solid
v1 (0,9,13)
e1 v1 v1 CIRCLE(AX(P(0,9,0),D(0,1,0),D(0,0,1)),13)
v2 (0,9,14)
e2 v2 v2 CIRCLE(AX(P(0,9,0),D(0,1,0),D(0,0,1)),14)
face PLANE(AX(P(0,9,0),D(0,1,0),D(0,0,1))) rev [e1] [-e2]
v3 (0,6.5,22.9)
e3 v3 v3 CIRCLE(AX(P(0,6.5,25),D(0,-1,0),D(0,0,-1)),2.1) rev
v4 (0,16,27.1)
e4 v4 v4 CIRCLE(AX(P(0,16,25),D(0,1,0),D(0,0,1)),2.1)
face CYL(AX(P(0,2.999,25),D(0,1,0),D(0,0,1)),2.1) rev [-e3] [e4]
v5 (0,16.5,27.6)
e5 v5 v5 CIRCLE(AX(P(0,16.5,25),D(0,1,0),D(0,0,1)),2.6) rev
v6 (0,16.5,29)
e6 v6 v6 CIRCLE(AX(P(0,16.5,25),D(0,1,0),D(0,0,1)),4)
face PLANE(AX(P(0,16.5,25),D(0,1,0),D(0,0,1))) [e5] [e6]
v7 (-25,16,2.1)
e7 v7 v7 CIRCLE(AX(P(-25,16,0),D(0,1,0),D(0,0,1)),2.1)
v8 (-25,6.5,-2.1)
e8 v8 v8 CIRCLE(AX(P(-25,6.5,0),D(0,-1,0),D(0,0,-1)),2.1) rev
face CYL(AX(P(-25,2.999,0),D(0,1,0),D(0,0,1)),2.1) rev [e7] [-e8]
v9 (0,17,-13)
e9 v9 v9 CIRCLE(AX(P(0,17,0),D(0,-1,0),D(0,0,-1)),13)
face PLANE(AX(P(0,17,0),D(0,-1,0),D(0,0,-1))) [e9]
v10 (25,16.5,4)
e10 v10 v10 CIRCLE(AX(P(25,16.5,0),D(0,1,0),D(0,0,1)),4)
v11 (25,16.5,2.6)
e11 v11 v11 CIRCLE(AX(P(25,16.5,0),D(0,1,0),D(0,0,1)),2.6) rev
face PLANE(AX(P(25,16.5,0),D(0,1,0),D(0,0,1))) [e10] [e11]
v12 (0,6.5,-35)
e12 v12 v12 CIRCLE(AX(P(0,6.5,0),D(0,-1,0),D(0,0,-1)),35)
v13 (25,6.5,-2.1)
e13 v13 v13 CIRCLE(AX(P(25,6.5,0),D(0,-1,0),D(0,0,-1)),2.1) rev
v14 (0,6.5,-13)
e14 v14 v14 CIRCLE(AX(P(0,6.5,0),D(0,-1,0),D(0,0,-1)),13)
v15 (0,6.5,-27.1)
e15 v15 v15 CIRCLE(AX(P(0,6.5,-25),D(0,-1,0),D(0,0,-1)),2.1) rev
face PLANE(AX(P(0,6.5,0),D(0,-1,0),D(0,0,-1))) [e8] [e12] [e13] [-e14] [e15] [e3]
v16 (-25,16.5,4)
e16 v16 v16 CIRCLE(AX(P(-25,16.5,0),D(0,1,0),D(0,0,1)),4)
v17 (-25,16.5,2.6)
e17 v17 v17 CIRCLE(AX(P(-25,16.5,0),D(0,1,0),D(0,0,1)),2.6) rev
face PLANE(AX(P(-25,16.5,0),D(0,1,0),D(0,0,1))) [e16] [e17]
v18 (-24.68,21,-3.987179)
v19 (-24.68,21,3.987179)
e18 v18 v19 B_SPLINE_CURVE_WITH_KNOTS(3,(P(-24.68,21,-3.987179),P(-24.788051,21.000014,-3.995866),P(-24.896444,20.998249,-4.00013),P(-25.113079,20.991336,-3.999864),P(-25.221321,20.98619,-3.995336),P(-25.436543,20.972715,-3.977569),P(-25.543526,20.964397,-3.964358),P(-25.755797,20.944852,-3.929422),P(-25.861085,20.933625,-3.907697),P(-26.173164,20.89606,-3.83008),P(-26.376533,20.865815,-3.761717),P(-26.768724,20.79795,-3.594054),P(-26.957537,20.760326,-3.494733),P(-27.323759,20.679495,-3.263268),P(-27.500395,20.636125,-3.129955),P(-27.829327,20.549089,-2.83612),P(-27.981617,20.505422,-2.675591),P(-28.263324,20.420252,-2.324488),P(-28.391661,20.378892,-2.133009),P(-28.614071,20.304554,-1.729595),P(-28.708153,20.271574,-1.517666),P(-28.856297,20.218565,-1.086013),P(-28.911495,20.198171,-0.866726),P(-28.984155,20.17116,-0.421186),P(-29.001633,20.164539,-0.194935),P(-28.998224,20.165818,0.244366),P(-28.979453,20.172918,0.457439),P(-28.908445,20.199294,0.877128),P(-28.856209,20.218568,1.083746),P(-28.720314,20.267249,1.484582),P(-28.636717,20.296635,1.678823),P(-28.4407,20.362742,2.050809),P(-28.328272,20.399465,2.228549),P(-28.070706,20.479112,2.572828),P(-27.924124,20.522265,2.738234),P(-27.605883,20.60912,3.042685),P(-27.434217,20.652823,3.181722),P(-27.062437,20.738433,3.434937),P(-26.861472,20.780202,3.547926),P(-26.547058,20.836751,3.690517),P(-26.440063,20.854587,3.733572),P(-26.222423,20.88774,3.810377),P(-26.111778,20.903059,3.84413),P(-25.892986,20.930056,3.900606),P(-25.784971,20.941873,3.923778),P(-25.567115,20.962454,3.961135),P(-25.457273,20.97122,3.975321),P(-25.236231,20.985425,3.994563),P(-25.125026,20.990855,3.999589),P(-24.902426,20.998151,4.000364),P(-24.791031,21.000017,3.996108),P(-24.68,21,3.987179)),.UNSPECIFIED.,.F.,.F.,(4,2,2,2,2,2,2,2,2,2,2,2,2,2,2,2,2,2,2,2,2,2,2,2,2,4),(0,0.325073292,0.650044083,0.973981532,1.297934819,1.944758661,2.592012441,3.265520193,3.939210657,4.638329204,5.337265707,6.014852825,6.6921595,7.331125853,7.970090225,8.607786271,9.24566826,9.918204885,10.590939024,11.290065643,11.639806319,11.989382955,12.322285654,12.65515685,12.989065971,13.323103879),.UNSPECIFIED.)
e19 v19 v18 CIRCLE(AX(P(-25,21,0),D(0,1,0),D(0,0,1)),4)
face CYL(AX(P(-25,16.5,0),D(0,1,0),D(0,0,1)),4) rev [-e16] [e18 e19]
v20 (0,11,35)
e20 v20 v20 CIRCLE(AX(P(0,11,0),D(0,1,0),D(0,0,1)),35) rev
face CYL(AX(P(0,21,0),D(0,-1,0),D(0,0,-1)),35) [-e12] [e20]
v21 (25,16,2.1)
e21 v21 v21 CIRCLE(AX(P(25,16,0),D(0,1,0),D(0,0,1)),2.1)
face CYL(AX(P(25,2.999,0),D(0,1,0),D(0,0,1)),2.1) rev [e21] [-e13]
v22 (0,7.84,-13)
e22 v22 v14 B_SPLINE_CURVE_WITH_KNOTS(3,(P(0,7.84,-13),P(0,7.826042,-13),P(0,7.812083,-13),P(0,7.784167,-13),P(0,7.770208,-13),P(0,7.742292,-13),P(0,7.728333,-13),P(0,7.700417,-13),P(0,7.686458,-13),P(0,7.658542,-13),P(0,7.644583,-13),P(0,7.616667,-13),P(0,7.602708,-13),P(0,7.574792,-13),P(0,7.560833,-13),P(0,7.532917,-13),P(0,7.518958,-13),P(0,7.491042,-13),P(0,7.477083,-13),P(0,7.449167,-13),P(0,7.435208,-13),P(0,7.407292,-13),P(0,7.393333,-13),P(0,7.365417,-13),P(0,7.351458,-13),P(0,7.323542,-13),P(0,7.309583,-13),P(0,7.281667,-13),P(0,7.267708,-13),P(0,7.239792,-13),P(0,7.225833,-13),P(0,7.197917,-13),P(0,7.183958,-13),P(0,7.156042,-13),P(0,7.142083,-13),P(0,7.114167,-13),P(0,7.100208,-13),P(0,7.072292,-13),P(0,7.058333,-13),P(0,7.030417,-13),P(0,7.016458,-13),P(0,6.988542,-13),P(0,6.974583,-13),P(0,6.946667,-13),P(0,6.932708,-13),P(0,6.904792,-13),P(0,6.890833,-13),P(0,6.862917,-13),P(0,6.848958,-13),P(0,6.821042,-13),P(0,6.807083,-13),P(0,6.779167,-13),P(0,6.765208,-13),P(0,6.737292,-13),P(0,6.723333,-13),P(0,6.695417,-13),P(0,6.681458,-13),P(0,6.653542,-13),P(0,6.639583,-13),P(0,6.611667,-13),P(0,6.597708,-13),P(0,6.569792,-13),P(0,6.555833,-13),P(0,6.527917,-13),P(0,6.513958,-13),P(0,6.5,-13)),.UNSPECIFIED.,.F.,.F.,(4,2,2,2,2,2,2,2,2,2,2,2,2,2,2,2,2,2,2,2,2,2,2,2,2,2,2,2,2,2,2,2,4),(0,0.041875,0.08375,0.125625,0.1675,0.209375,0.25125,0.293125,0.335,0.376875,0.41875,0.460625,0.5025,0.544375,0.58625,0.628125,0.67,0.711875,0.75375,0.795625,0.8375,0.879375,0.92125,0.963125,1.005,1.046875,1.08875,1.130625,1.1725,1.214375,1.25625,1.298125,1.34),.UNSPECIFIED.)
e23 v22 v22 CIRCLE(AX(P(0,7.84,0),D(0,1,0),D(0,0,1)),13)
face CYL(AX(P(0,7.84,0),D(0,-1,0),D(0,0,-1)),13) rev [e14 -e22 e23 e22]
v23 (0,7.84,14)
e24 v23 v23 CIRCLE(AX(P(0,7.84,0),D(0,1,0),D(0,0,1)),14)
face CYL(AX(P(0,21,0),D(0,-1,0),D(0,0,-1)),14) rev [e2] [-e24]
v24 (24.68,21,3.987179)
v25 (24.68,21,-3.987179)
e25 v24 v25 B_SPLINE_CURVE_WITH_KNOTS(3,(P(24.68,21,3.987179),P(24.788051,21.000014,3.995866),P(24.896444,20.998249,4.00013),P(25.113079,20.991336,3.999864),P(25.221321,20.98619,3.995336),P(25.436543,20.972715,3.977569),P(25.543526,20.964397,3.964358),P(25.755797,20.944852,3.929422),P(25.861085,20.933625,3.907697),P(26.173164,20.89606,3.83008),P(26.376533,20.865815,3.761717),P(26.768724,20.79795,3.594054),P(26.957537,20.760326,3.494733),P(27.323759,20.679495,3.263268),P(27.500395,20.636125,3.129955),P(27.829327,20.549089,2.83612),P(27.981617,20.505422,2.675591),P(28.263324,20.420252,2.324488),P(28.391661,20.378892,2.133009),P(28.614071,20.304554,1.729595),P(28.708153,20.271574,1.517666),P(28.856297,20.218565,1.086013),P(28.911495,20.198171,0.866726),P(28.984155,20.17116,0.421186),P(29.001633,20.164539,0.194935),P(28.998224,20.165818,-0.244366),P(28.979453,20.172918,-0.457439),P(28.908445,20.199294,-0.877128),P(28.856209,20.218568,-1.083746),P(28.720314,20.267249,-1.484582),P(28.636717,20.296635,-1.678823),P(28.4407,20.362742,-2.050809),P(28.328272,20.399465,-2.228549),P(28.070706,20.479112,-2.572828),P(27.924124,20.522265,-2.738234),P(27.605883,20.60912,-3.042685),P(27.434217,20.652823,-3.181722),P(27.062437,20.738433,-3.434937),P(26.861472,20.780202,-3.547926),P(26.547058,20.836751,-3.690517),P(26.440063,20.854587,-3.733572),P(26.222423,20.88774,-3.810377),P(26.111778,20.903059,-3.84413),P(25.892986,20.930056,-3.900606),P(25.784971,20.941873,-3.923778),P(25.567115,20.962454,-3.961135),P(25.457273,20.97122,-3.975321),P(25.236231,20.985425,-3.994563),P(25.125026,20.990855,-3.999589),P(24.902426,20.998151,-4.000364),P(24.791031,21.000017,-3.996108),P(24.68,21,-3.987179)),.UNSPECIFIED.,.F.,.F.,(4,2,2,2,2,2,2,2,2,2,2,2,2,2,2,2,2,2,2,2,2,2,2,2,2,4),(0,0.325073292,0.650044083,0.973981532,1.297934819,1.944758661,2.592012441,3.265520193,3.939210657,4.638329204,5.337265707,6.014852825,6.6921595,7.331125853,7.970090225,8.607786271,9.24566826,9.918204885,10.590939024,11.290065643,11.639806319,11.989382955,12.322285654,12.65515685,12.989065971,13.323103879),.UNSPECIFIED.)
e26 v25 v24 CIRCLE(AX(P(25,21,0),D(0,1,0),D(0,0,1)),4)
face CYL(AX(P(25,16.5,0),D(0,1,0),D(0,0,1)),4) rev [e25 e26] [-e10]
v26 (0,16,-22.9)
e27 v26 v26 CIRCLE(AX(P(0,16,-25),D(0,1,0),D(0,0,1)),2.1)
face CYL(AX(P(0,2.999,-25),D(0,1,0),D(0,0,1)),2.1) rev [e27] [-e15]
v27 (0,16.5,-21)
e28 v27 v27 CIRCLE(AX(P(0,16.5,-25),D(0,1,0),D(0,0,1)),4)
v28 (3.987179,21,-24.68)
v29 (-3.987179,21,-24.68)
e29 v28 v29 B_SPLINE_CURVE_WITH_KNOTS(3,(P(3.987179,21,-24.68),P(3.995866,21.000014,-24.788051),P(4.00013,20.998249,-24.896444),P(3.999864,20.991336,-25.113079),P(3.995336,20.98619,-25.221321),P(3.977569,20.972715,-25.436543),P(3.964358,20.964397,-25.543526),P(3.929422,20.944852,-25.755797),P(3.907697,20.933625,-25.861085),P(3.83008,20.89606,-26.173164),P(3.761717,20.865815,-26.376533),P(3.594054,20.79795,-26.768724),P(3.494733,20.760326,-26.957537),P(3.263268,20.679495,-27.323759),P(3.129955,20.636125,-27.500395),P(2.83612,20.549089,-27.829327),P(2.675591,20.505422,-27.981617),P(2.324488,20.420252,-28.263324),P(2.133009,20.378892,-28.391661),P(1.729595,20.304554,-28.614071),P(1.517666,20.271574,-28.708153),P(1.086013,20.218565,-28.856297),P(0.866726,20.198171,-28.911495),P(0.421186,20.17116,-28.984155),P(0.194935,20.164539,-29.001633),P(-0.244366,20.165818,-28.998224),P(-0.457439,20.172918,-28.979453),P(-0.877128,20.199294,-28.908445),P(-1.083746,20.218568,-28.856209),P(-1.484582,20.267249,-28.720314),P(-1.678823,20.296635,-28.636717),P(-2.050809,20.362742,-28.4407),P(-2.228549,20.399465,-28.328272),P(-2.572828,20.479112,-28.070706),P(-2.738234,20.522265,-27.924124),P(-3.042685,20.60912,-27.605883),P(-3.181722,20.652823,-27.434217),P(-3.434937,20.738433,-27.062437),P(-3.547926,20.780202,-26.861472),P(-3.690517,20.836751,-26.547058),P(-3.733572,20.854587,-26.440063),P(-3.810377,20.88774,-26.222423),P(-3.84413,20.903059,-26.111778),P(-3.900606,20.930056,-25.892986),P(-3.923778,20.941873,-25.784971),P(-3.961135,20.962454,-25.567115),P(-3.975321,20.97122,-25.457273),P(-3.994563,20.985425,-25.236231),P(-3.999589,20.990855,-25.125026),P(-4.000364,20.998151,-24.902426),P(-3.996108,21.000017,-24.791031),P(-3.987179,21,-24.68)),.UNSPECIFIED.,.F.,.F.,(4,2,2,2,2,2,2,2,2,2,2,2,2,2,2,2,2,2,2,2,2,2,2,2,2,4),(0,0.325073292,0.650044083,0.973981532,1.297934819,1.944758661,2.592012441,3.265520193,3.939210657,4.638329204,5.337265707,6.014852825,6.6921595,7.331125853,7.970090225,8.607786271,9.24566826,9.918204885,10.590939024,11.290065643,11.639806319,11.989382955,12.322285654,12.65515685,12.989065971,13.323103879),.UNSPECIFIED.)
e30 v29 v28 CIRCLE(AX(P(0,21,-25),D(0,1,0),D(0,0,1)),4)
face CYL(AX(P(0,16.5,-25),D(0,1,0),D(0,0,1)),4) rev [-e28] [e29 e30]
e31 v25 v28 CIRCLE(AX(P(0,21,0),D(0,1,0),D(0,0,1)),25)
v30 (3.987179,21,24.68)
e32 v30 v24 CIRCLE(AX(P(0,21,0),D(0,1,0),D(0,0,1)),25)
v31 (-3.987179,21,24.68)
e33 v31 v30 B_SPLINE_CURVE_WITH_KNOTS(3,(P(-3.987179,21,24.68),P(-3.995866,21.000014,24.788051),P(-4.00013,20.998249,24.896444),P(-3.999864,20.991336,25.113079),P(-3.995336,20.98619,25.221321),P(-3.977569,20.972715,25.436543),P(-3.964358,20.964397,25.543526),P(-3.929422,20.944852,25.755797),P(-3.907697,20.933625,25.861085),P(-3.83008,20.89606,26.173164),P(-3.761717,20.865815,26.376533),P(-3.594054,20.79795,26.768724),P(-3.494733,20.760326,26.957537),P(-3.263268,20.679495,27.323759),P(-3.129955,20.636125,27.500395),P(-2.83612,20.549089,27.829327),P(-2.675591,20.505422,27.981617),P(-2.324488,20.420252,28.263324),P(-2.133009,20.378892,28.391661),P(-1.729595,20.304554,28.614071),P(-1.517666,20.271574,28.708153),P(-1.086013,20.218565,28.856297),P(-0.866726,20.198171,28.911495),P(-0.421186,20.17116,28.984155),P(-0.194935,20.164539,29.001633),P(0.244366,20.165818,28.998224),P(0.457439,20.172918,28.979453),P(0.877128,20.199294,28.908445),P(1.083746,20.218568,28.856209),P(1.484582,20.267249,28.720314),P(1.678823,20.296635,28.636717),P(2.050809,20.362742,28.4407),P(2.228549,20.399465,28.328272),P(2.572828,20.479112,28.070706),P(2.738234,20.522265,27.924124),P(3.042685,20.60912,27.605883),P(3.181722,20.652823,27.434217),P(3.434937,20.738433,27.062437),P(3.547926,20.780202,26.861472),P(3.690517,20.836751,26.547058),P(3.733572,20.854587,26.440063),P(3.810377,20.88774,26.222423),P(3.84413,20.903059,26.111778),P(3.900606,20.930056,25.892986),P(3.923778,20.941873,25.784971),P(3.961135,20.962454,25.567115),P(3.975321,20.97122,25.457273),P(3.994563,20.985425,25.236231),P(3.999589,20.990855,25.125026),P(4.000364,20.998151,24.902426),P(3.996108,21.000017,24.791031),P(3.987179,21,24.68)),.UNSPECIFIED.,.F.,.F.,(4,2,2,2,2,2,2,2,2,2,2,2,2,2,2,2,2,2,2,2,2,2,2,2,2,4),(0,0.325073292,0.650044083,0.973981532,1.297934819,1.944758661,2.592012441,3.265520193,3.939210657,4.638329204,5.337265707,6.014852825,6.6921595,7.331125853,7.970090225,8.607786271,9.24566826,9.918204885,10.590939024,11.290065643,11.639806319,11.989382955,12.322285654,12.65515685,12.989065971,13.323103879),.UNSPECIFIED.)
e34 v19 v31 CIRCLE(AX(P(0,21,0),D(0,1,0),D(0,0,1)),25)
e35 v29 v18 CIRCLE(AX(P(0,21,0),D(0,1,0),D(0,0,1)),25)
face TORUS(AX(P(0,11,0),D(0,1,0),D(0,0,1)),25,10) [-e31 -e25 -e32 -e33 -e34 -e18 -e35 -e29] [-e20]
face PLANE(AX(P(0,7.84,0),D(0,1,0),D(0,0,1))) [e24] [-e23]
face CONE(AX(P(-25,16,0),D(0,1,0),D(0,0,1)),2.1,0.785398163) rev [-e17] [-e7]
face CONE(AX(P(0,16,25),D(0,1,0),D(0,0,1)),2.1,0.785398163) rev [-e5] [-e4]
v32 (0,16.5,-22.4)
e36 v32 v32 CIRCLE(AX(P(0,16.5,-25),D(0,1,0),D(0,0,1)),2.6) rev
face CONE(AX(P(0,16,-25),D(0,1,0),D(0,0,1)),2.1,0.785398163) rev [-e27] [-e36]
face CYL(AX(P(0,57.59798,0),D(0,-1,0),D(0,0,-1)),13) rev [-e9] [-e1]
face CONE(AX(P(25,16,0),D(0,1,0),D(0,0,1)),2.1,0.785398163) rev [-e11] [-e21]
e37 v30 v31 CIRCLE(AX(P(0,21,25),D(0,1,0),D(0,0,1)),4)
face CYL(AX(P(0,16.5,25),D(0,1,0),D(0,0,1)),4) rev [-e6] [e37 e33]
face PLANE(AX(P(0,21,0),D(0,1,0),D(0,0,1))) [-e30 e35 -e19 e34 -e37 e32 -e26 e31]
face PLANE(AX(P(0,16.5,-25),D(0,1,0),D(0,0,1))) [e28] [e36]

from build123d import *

# Parameters (mm, degrees)
BOSS_EXTRUDE1_START       = 3
SKETCH1_R                 = 35
SKETCH1_R_2               = 14
BOSS_EXTRUDE1_DEPTH       = 18
BOSS_EXTRUDE2_START       = 18
SKETCH1_3_R               = 14
BOSS_EXTRUDE2_DEPTH       = 3
BOSS_EXTRUDE3_START       = 9
SKETCH1_4_R               = 14
SKETCH1_4_R_2             = 13
BOSS_EXTRUDE3_DEPTH       = 9
CUT_EXTRUDE1_REACH        = 54.669
SKETCH2_R                 = 2.1
SKETCH2_3_R               = 4
SKETCH2_3_R_2             = 2.1
CUT_EXTRUDE2_DEPTH        = 4.5
CHAMFER1_SIZE             = 0.5
BOSS_EXTRUDE4_START       = 3
BOSS_EXTRUDE4_OUTLINE_R   = 14
BOSS_EXTRUDE4_OUTLINE_R_2 = 13
BOSS_EXTRUDE4_DEPTH       = 4.84
BOSS_EXTRUDE5_START       = 1
SKETCH3_R                 = 13
BOSS_EXTRUDE5_DEPTH       = 1
SKETCH4_R                 = 35
CUT_EXTRUDE3_DEPTH        = 3.5
FILLET1_R                 = 10


# Read off the part's stored shape, not the designer's step: Boss-Extrude4
with BuildPart() as part:
    # Sketch1 → Boss-Extrude1 (new body)
    with BuildSketch(Plane(origin=(0, 0, 0), x_dir=(1, 0, 0), z_dir=(0, 1, 0)).offset(BOSS_EXTRUDE1_START)):
        with Locations(Location((0, 0, 0), (0, 0, 270))):
            Circle(SKETCH1_R)
        with Locations(Location((0, 0, 0), (0, 0, 270))):
            Circle(SKETCH1_R_2, mode=Mode.SUBTRACT)
    extrude(amount=BOSS_EXTRUDE1_DEPTH)

    # Sketch1<3> → Boss-Extrude2 (add)
    with BuildSketch(Plane(origin=(0, 0, 0), x_dir=(1, 0, 0), z_dir=(0, 1, 0)).offset(BOSS_EXTRUDE2_START)):
        with Locations(Location((0, 0, 0), (0, 0, 270))):
            Circle(SKETCH1_3_R)
    extrude(amount=BOSS_EXTRUDE2_DEPTH)

    # Sketch1<4> → Boss-Extrude3 (add)
    with BuildSketch(Plane(origin=(0, 0, 0), x_dir=(1, 0, 0), z_dir=(0, 1, 0)).offset(BOSS_EXTRUDE3_START)):
        with Locations(Location((0, 0, 0), (0, 0, 270))):
            Circle(SKETCH1_4_R)
        with Locations(Location((0, 0, 0), (0, 0, 270))):
            Circle(SKETCH1_4_R_2, mode=Mode.SUBTRACT)
    extrude(amount=BOSS_EXTRUDE3_DEPTH)

    # Sketch2 → Cut-Extrude1 (cut, up to next)
    with BuildSketch(Plane(origin=(0, 21, 0), x_dir=(1, 0, 0), z_dir=(0, 1, 0)), mode=Mode.PRIVATE) as cut_extrude1_sk1:
        with Locations(Location((0, -25, 0), (0, 0, 270))):
            Circle(SKETCH2_R)
    cut_extrude1_tool1 = extrude(cut_extrude1_sk1.sketch, amount=-CUT_EXTRUDE1_REACH, mode=Mode.PRIVATE) & part.part
    # Sketch2 → Cut-Extrude1 (cut, up to next)
    with BuildSketch(Plane(origin=(0, 21, 0), x_dir=(1, 0, 0), z_dir=(0, 1, 0)), mode=Mode.PRIVATE) as cut_extrude1_sk2:
        with Locations(Location((-25, 0, 0), (0, 0, 270))):
            Circle(SKETCH2_R)
    cut_extrude1_tool2 = extrude(cut_extrude1_sk2.sketch, amount=-CUT_EXTRUDE1_REACH, mode=Mode.PRIVATE) & part.part
    # Sketch2 → Cut-Extrude1 (cut, up to next)
    with BuildSketch(Plane(origin=(0, 21, 0), x_dir=(1, 0, 0), z_dir=(0, 1, 0)), mode=Mode.PRIVATE) as cut_extrude1_sk3:
        with Locations(Location((25, 0, 0), (0, 0, 270))):
            Circle(SKETCH2_R)
    cut_extrude1_tool3 = extrude(cut_extrude1_sk3.sketch, amount=-CUT_EXTRUDE1_REACH, mode=Mode.PRIVATE) & part.part
    # Sketch2 → Cut-Extrude1 (cut, up to next)
    with BuildSketch(Plane(origin=(0, 21, 0), x_dir=(1, 0, 0), z_dir=(0, 1, 0)), mode=Mode.PRIVATE) as cut_extrude1_sk4:
        with Locations(Location((0, 25, 0), (0, 0, 270))):
            Circle(SKETCH2_R)
    cut_extrude1_tool4 = extrude(cut_extrude1_sk4.sketch, amount=-CUT_EXTRUDE1_REACH, mode=Mode.PRIVATE) & part.part
    add(cut_extrude1_tool1.solids().sort_by_distance((0, 21, 25))[0], mode=Mode.SUBTRACT)
    add(cut_extrude1_tool2.solids().sort_by_distance((-25, 21, 0))[0], mode=Mode.SUBTRACT)
    add(cut_extrude1_tool3.solids().sort_by_distance((25, 21, 0))[0], mode=Mode.SUBTRACT)
    add(cut_extrude1_tool4.solids().sort_by_distance((0, 21, -25))[0], mode=Mode.SUBTRACT)

    # Sketch2<3> → Cut-Extrude2 (cut)
    # profile 1 of 4: a face of its own
    with BuildSketch(Plane(origin=(0, 21, 0), x_dir=(1, 0, 0), z_dir=(0, 1, 0))):
        with Locations(Location((0, -25, 0), (0, 0, 270))):
            Circle(SKETCH2_3_R)
        with Locations(Location((0, -25, 0), (0, 0, 270))):
            Circle(SKETCH2_3_R_2, mode=Mode.SUBTRACT)
    # profile 2 of 4: a face of its own
    with BuildSketch(Plane(origin=(0, 21, 0), x_dir=(1, 0, 0), z_dir=(0, 1, 0))):
        with Locations(Location((-25, 0, 0), (0, 0, 270))):
            Circle(SKETCH2_3_R)
        with Locations(Location((-25, 0, 0), (0, 0, 270))):
            Circle(SKETCH2_3_R_2, mode=Mode.SUBTRACT)
    # profile 3 of 4: a face of its own
    with BuildSketch(Plane(origin=(0, 21, 0), x_dir=(1, 0, 0), z_dir=(0, 1, 0))):
        with Locations(Location((0, 25, 0), (0, 0, 270))):
            Circle(SKETCH2_3_R)
        with Locations(Location((0, 25, 0), (0, 0, 270))):
            Circle(SKETCH2_3_R_2, mode=Mode.SUBTRACT)
    # profile 4 of 4: a face of its own
    with BuildSketch(Plane(origin=(0, 21, 0), x_dir=(1, 0, 0), z_dir=(0, 1, 0))):
        with Locations(Location((25, 0, 0), (0, 0, 270))):
            Circle(SKETCH2_3_R)
        with Locations(Location((25, 0, 0), (0, 0, 270))):
            Circle(SKETCH2_3_R_2, mode=Mode.SUBTRACT)
    extrude(amount=-CUT_EXTRUDE2_DEPTH, mode=Mode.SUBTRACT)

    # Chamfer1
    chamfer1_edges = [part.edges().sort_by_distance(p)[0] for p in [
        (0, 16.5, 22.9),
        (-25, 16.5, -2.1),
        (0, 16.5, -27.1),
        (25, 16.5, -2.1),
    ]]
    chamfer(chamfer1_edges, length=CHAMFER1_SIZE)

    # Boss-Extrude4 outline → Boss-Extrude4 (add)
    with BuildSketch(Plane(origin=(0, 0, 0), x_dir=(1, 0, 0), z_dir=(0, 1, 0)).offset(BOSS_EXTRUDE4_START)):
        Circle(BOSS_EXTRUDE4_OUTLINE_R)
        Circle(BOSS_EXTRUDE4_OUTLINE_R_2, mode=Mode.SUBTRACT)
    extrude(amount=BOSS_EXTRUDE4_DEPTH)

    # Sketch3 → Boss-Extrude5 (add)
    with BuildSketch(Plane.XZ.offset(-18).offset(BOSS_EXTRUDE5_START)):
        with Locations(Location((0, 0, 0), (0, 0, 270))):
            Circle(SKETCH3_R)
    extrude(amount=-BOSS_EXTRUDE5_DEPTH)

    # Sketch4 → Cut-Extrude3 (cut)
    with BuildSketch(Plane.XZ.offset(-3)):
        with Locations(Location((0, 0, 0), (0, 0, 270))):
            Circle(SKETCH4_R)
    extrude(amount=-CUT_EXTRUDE3_DEPTH, mode=Mode.SUBTRACT)

    # Fillet1
    # the kernel refuses this fillet: 10 mm, written as the material it takes off along each edge
    with BuildSketch(Plane(origin=(0, 21, 0), x_dir=(0, 0, 1), z_dir=(-1, 0, 0))) as fillet1_piece_1:
        with BuildLine():
            CenterArc((35 - FILLET1_R, -FILLET1_R), FILLET1_R, 0, 90)
            Line((35, -FILLET1_R), (35, 0))
            Line((35, 0), (35 - FILLET1_R, 0))
        make_face()
    revolve(axis=Axis((0, 21, 0), (0, 1, 0)), mode=Mode.SUBTRACT)


solid = part.part
